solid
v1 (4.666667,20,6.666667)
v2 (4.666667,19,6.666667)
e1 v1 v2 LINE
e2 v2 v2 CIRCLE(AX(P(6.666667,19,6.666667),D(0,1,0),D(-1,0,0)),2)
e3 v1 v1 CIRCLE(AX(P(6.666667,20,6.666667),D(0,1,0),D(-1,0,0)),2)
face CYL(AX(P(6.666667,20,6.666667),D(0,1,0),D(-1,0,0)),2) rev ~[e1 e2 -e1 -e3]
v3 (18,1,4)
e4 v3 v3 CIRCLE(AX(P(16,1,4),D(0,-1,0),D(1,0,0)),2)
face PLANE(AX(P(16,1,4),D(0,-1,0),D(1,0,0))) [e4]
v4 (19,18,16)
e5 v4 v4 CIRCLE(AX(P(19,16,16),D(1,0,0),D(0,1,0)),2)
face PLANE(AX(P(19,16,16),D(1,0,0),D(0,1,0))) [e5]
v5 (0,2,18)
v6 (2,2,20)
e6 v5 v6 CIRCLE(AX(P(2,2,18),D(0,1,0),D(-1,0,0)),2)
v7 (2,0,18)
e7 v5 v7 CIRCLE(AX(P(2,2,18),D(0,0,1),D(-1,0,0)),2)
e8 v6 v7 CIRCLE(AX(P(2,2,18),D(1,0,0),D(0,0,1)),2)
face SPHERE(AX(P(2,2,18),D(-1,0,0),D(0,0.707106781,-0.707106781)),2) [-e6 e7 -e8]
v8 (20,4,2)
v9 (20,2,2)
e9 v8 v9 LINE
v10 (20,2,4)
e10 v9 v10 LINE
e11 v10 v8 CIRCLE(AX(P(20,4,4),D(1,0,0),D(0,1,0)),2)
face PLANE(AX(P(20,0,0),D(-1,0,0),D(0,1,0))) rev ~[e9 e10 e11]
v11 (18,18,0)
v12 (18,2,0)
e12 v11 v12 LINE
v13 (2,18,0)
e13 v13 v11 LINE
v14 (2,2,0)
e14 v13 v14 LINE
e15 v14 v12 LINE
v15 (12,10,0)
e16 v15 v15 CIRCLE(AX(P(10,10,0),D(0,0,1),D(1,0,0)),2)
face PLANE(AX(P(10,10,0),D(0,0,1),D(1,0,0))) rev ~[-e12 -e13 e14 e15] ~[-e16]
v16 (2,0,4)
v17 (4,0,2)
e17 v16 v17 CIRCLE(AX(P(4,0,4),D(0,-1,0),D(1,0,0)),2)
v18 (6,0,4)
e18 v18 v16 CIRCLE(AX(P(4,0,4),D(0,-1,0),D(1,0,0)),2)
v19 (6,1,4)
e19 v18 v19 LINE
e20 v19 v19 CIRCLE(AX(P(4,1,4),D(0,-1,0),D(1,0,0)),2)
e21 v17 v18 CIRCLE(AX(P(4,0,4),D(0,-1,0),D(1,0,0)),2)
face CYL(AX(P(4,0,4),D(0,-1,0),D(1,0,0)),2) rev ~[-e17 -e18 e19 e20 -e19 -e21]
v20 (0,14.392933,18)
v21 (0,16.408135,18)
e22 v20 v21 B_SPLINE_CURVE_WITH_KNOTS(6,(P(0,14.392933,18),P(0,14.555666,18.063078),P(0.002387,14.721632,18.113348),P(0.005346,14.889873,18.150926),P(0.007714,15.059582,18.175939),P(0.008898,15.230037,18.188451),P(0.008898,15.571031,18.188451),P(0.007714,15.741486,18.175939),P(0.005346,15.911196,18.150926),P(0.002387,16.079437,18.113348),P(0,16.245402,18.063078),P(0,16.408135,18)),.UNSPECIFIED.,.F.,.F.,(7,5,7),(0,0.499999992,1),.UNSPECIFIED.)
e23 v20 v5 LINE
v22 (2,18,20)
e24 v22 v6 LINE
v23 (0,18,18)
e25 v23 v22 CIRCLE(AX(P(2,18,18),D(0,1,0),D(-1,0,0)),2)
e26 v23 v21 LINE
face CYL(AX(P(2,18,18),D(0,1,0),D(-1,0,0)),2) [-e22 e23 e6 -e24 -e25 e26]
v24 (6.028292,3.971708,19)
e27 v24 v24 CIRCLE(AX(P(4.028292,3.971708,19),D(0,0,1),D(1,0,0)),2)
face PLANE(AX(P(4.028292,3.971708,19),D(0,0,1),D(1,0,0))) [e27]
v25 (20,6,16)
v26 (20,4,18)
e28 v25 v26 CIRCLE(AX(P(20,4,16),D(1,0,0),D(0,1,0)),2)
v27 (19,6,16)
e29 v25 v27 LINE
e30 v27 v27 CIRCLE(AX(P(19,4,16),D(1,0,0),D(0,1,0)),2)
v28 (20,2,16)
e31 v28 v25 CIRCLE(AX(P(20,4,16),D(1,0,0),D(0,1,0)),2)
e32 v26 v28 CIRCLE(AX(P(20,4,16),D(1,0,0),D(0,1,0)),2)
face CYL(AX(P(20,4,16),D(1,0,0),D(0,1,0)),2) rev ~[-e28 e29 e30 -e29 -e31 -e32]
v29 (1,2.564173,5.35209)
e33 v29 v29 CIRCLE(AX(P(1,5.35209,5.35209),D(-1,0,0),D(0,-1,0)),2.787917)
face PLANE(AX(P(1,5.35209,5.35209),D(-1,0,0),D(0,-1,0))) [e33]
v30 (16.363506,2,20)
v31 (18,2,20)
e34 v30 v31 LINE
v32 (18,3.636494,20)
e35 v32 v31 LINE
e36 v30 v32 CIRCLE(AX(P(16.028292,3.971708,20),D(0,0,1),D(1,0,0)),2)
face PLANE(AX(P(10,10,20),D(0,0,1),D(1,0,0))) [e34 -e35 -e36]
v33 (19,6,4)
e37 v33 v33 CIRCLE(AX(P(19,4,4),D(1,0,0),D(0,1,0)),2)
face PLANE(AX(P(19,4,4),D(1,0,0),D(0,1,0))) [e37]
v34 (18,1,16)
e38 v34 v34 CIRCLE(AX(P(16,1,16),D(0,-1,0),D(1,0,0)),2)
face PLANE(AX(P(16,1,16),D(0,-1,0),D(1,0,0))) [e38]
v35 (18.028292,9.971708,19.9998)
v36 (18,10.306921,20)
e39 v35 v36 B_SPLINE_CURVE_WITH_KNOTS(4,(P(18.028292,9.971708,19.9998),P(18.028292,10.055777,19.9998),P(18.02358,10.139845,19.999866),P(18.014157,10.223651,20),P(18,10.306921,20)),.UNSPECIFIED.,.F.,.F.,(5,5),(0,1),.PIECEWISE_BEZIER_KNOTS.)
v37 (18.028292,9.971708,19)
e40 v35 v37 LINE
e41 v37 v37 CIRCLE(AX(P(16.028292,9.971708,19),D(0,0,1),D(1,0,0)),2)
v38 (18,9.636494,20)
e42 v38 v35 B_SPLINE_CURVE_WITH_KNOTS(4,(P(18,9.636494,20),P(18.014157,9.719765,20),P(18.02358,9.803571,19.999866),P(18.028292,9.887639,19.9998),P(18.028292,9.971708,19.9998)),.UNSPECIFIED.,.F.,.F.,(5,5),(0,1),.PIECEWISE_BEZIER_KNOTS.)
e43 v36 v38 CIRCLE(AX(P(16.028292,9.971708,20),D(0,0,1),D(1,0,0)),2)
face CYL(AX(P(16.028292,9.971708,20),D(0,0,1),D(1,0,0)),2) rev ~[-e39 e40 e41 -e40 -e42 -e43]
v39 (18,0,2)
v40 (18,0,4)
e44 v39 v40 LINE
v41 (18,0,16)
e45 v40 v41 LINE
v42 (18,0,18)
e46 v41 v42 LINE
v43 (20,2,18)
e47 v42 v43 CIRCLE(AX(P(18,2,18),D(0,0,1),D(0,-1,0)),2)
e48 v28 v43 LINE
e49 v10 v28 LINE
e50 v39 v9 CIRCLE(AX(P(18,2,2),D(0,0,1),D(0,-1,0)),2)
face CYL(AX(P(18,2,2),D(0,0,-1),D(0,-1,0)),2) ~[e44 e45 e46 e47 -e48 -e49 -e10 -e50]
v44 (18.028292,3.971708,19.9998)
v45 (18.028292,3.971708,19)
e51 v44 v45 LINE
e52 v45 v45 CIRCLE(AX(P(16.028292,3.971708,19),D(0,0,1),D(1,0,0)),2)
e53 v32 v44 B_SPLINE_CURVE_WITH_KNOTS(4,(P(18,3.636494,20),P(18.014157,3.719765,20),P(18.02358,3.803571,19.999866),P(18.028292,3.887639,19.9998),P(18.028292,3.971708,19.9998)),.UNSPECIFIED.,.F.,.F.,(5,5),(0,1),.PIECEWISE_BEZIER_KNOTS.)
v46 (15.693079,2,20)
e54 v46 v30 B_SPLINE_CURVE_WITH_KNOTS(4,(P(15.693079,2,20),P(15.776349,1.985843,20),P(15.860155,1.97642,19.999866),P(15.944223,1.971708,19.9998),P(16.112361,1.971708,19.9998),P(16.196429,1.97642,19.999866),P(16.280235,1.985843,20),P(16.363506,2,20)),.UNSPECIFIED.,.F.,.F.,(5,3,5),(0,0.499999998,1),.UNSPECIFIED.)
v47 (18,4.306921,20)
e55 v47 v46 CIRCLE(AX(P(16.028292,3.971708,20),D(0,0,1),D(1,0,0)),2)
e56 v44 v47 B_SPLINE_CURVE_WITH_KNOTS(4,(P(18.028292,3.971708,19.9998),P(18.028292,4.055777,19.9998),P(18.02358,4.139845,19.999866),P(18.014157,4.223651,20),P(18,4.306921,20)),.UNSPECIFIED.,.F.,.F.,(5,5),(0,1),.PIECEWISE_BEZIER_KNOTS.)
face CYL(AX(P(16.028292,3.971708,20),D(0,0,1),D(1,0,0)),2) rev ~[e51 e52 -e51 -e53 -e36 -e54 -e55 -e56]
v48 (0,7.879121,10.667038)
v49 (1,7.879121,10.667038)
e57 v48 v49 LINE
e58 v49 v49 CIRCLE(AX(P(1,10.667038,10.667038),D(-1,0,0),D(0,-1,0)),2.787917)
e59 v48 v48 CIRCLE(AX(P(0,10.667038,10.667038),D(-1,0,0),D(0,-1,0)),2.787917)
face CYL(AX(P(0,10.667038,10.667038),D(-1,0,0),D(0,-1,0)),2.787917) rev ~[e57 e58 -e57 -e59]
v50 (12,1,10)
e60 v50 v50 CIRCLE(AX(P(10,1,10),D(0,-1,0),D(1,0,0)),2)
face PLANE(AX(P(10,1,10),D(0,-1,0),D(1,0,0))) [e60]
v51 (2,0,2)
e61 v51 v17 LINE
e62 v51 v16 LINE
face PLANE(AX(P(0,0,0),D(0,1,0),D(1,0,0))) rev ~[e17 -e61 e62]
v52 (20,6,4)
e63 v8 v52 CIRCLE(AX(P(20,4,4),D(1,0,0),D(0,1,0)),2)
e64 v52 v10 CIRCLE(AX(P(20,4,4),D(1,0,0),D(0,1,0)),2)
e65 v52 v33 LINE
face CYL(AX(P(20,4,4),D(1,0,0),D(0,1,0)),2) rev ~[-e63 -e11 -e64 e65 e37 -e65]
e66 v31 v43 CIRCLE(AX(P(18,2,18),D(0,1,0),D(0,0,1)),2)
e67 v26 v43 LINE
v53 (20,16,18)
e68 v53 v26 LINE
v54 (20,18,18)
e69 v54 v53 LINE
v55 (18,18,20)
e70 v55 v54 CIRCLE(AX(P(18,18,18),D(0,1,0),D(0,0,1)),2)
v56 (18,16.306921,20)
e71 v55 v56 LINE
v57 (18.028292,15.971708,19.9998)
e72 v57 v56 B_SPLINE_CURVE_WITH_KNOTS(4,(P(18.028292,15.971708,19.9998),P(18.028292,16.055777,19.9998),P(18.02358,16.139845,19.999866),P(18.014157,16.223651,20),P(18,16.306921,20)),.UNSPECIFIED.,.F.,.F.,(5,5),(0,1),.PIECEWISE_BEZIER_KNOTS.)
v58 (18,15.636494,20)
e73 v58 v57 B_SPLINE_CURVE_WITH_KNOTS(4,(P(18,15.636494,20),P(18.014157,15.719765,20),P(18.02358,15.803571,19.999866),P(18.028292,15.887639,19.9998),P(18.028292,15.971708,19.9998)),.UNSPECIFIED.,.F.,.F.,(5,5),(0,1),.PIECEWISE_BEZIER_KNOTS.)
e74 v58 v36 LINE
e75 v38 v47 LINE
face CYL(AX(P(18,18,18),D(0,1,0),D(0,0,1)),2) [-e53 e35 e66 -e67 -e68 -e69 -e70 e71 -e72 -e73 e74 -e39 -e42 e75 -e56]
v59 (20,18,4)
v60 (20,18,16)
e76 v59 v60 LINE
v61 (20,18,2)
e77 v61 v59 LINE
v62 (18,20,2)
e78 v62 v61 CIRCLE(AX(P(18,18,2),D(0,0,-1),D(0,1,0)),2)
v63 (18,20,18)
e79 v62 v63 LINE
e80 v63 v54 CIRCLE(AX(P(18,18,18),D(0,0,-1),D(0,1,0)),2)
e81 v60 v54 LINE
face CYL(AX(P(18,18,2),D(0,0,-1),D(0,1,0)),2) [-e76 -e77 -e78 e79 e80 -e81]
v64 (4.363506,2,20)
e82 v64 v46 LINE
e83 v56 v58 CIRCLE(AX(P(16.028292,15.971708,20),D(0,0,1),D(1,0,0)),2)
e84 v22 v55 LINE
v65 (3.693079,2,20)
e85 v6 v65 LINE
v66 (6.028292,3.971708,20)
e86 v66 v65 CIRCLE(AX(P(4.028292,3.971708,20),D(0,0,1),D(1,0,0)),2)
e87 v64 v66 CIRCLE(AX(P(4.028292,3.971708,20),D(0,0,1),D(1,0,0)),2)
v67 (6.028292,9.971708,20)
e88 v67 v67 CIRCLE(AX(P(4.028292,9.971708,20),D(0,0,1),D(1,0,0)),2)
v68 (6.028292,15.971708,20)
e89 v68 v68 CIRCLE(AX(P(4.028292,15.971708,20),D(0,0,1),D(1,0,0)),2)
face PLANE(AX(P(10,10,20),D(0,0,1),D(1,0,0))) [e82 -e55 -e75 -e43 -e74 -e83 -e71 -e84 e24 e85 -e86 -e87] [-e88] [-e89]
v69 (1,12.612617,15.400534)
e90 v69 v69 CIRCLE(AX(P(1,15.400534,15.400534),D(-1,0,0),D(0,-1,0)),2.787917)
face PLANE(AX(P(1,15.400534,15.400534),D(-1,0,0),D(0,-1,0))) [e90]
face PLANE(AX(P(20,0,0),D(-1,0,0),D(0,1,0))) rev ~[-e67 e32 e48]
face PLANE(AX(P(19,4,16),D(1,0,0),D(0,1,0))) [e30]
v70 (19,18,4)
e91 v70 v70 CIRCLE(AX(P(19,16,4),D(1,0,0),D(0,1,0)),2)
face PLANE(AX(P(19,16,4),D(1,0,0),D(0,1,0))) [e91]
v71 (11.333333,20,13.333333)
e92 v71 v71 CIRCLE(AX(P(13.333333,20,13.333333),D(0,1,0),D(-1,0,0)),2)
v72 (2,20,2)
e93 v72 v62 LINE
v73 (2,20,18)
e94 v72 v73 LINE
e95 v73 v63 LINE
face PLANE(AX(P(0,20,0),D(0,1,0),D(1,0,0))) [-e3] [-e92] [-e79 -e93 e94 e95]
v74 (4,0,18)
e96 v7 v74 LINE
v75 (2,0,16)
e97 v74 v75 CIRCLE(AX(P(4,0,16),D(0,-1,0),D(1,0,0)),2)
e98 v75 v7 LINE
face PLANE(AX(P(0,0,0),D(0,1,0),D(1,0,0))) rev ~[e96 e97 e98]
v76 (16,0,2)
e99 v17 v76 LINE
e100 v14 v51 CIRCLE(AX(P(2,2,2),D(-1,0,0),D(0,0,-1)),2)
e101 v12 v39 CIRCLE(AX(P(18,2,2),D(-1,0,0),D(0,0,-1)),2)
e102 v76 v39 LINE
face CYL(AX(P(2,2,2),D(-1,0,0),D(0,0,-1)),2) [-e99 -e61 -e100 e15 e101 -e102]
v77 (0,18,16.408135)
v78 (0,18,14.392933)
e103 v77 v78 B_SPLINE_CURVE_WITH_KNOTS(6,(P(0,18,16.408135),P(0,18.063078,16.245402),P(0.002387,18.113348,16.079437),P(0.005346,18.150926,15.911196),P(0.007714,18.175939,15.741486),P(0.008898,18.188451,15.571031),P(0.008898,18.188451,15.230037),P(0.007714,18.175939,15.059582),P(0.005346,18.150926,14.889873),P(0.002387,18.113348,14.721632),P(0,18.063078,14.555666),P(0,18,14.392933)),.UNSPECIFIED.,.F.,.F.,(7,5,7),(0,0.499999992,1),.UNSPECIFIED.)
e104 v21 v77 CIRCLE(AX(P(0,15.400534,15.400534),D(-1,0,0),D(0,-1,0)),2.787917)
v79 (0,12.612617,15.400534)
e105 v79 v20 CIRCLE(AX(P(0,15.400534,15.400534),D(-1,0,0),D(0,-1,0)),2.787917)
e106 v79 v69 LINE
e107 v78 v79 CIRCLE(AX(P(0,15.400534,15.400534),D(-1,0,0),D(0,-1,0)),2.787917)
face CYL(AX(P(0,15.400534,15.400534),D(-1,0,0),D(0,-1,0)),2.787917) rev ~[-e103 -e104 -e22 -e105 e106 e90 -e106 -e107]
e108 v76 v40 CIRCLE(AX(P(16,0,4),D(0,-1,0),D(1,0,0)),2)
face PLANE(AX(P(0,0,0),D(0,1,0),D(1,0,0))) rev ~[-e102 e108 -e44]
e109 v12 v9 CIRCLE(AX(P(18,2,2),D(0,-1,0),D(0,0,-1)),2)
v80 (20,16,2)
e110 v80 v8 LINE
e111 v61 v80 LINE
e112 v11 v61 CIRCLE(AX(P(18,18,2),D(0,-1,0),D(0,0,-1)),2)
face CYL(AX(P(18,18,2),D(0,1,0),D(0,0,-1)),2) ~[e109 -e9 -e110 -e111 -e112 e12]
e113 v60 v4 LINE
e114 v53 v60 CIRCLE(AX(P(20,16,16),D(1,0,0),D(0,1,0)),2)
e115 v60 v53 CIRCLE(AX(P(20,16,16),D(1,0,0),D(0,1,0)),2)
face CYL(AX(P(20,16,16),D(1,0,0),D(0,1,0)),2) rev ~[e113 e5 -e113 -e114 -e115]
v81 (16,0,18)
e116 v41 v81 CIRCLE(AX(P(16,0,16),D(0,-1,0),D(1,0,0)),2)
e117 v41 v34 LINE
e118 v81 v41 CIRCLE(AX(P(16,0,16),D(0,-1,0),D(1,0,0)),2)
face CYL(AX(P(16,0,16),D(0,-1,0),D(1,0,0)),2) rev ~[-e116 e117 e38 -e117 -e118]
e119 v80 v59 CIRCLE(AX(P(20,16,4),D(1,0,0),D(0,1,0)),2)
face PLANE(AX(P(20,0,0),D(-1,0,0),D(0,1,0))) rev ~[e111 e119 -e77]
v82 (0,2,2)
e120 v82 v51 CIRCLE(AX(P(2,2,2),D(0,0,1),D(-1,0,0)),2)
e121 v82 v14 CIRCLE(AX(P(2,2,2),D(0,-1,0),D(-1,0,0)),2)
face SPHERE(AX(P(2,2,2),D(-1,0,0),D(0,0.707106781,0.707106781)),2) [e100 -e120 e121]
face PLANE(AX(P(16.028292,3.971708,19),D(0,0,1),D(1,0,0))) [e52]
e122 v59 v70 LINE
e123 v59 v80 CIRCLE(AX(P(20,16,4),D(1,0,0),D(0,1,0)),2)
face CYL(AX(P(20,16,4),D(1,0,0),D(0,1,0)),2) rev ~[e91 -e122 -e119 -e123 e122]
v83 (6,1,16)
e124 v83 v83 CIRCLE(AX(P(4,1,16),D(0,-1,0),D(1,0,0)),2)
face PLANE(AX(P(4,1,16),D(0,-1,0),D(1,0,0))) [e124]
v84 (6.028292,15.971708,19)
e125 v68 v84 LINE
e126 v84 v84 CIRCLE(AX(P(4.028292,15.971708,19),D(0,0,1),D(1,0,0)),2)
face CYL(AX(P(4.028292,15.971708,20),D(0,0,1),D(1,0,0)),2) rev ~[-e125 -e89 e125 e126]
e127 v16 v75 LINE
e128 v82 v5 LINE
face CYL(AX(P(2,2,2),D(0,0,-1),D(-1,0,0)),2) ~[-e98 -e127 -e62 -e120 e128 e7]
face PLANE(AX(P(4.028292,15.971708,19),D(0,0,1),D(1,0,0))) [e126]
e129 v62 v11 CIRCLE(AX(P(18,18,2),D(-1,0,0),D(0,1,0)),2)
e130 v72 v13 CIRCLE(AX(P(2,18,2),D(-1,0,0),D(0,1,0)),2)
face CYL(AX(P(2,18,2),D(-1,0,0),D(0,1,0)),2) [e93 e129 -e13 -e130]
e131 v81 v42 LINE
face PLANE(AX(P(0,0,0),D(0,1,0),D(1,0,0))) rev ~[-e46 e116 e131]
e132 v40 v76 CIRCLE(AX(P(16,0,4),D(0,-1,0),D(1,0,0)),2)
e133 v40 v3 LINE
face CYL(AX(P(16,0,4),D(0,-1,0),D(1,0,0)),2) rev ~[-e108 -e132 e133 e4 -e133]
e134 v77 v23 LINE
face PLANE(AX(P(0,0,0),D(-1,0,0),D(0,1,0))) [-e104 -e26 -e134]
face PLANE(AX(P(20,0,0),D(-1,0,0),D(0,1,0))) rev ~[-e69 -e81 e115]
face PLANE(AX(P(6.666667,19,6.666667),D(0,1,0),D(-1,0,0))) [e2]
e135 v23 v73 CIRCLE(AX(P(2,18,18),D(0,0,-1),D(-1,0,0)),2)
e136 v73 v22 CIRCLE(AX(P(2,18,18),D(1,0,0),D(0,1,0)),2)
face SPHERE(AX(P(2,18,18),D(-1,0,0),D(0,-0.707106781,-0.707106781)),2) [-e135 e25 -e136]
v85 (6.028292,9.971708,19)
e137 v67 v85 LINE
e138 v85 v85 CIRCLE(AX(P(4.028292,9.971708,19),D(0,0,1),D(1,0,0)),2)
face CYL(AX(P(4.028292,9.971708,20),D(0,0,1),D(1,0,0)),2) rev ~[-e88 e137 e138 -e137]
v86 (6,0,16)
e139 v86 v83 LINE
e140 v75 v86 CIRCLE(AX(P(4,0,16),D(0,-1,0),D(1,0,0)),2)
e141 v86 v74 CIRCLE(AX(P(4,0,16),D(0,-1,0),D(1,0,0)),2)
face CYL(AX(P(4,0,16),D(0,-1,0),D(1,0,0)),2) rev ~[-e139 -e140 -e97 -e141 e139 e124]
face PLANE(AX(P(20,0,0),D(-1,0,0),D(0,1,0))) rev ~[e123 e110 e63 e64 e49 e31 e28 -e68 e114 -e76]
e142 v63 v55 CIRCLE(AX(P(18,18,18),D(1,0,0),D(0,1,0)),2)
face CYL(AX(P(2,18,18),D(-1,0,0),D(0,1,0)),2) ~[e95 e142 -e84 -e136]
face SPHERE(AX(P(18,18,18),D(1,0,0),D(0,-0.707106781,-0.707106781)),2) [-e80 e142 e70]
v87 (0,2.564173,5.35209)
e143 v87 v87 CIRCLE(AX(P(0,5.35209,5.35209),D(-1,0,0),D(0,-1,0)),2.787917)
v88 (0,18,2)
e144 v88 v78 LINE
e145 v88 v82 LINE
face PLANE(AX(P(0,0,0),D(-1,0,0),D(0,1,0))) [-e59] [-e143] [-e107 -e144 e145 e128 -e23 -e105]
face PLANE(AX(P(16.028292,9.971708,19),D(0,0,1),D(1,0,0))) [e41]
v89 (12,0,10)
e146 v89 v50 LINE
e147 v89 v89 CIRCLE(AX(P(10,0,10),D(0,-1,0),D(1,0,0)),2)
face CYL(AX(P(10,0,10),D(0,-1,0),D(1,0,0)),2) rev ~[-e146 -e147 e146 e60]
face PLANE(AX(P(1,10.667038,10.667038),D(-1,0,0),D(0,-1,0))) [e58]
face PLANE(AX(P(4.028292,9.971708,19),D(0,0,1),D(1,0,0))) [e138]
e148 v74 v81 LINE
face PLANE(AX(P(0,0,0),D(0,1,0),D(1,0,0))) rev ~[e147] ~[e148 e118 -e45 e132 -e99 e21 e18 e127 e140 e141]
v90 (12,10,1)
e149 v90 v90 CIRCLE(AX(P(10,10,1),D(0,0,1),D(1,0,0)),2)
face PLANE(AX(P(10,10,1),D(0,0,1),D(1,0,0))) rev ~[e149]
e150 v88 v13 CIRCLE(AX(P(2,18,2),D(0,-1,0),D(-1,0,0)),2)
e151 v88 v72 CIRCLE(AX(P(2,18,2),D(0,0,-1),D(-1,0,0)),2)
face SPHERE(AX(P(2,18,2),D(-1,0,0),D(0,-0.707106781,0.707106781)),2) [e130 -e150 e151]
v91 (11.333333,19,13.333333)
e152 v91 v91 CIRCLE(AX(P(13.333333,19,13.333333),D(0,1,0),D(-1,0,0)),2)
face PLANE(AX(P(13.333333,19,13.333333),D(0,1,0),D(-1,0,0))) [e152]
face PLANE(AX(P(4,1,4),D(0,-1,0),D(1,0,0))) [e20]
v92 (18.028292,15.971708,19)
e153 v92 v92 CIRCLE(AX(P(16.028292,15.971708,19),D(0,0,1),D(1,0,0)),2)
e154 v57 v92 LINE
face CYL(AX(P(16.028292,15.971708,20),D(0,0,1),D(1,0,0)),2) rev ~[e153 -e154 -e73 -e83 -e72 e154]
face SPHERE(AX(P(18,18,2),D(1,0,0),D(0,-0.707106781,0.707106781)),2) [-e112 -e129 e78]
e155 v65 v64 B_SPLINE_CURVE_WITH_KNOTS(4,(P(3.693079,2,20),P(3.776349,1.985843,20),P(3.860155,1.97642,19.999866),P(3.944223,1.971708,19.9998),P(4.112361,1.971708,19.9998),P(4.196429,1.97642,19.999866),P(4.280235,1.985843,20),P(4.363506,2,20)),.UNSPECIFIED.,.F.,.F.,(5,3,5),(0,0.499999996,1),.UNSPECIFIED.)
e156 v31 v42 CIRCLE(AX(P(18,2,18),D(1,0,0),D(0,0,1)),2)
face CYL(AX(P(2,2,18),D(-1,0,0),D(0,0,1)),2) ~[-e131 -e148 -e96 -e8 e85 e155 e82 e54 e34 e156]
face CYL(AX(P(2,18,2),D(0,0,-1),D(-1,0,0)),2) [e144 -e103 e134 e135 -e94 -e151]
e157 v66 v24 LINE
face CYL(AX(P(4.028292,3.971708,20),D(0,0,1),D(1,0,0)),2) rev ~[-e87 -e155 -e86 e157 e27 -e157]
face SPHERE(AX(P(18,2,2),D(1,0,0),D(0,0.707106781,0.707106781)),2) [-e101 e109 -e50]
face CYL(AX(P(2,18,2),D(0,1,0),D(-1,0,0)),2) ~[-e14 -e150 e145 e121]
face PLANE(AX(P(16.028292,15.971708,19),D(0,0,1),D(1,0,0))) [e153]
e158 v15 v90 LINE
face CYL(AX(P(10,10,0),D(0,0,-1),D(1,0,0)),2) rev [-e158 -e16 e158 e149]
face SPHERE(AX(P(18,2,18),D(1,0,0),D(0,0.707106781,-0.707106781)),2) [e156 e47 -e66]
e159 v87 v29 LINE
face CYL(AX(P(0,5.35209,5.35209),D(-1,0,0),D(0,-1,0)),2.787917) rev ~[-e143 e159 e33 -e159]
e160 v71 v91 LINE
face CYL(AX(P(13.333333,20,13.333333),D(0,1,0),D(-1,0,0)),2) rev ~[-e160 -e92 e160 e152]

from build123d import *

# Parameters (mm, degrees)
F0_W          = 20
F0_H          = 20
F1_DEPTH      = 20
F3_R          = 2
F8_DEPTH      = 1
F2_R          = 2
F11_DEPTH     = 1
F6_R          = 2.787917168
F12_DEPTH     = 1
F4_R          = 2
F13_DEPTH     = 1
F14_DEPTH     = 1
F5_R          = 2
F15_DEPTH     = 1
F7_R          = 2
F16_DEPTH     = 1
F17_T1_DEPTH  = 16
F17_T3_DEPTH  = 16
F17_T5_DEPTH  = 16
F17_S9_W      = 2
F17_S9_H      = 2
F17_T10_DEPTH = 2
F17_S15_W     = 2
F17_S15_H     = 2
F17_T16_DEPTH = 2
F17_S21_W     = 2
F17_S21_H     = 2
F17_T22_DEPTH = 2
F17_S27_W     = 2
F17_S27_H     = 2
F17_T28_DEPTH = 2
F17_S33_W     = 2
F17_S33_H     = 2
F17_T34_DEPTH = 2
F17_S39_W     = 2
F17_S39_H     = 2
F17_T40_DEPTH = 2
F17_S45_W     = 2
F17_S45_H     = 2
F17_T46_DEPTH = 2
F17_S51_W     = 2
F17_S51_H     = 2
F17_T52_DEPTH = 2


# Not quite as in the source:
# - a fillet or chamfer that OpenCascade refuses, or shapes differently, is made with other operations: its cross-section is extruded or revolved along the edge and cut away or added
# - a feature of the source that left no trace in its solid (it failed there, or was rolled back) is left out


with BuildPart() as f1:
    # F0 (on Top) → F1 (new body)
    with BuildSketch(Plane.XY):
        with Locations((10, 10)):
            Rectangle(F0_W, F0_H)
    extrude(amount=F1_DEPTH)

    # F3 (on face) → F8 (cut)
    with BuildSketch(Plane.XY.offset(20)):
        with Locations((4.0282921307, 15.9717078693)):
            Circle(F3_R)
        with Locations((4.0282921307, 9.9717078693)):
            Circle(F3_R)
        with Locations((4.0282921307, 3.9717078693)):
            Circle(F3_R)
        with Locations((16.0282921307, 15.9717078693)):
            Circle(F3_R)
        with Locations((16.0282921307, 9.9717078693)):
            Circle(F3_R)
        with Locations((16.0282921307, 3.9717078693)):
            Circle(F3_R)
    extrude(amount=-F8_DEPTH, mode=Mode.SUBTRACT)

    # F2 (on Top) → F11 (cut)
    with BuildSketch(Plane.XY):
        with Locations((10, 10)):
            Circle(F2_R)
    extrude(amount=F11_DEPTH, mode=Mode.SUBTRACT)

    # F6 (on face) → F12 (cut)
    with BuildSketch(Plane(origin=(0, 0, 0), x_dir=(0, -1, 0), z_dir=(-1, 0, 0))):
        with Locations((-15.4005342424, 15.4005342424)):
            Circle(F6_R)
        with Locations((-10.667038206, 10.667038206)):
            Circle(F6_R)
        with Locations((-5.3520903582, 5.3520903582)):
            Circle(F6_R)
    extrude(amount=-F12_DEPTH, mode=Mode.SUBTRACT)

    # F4 (on Front) → F13 (cut)
    with BuildSketch(Plane.XZ):
        with Locations((16, 4)):
            Circle(F4_R)
        with Locations((4, 16)):
            Circle(F4_R)
        with Locations((16, 16)):
            Circle(F4_R)
        with Locations((4, 4)):
            Circle(F4_R)
        with Locations((10, 10)):
            Circle(F4_R)
    extrude(amount=-F13_DEPTH, mode=Mode.SUBTRACT)

    # F6 (on face) → F14 (cut)
    with BuildSketch(Plane(origin=(0, 0, 0), x_dir=(0, -1, 0), z_dir=(-1, 0, 0))):
        with Locations((-15.4005342424, 15.4005342424)):
            Circle(F6_R)
        with Locations((-10.667038206, 10.667038206)):
            Circle(F6_R)
        with Locations((-5.3520903582, 5.3520903582)):
            Circle(F6_R)
    extrude(amount=-F14_DEPTH, mode=Mode.SUBTRACT)

    # F5 (on face) → F15 (cut)
    with BuildSketch(Plane(origin=(0, 20, 0), x_dir=(-1, 0, 0), z_dir=(0, 1, 0))):
        with Locations((-13.3333333333, 13.3333333333)):
            Circle(F5_R)
        with Locations((-6.6666666667, 6.6666666667)):
            Circle(F5_R)
    extrude(amount=-F15_DEPTH, mode=Mode.SUBTRACT)

    # F7 (on face) → F16 (cut)
    with BuildSketch(Plane.YZ.offset(20)):
        with Locations((16, 4)):
            Circle(F7_R)
        with Locations((16, 16)):
            Circle(F7_R)
        with Locations((4, 16)):
            Circle(F7_R)
        with Locations((4, 4)):
            Circle(F7_R)
    extrude(amount=-F16_DEPTH, mode=Mode.SUBTRACT)

    # F17: fillet of radius 2 on 12 edges, made by hand

    # F17_s2 → F17_t1 (cut)
    with BuildSketch(Plane.YZ.offset(2)):
        with BuildLine():
            ThreePointArc((20, 2), (19.4142135624, 0.5857864376), (18, 0))
            Line((18, 0), (20, 0))
            Line((20, 0), (20, 2))
        make_face()
        with BuildLine():
            ThreePointArc((2, 0), (0.5857864376, 0.5857864376), (0, 2))
            Line((0, 2), (0, 0))
            Line((0, 0), (2, 0))
        make_face()
        with BuildLine():
            ThreePointArc((2, 20), (0.5857864376, 19.4142135624), (0, 18))
            Line((0, 18), (0, 20))
            Line((0, 20), (2, 20))
        make_face()
        with BuildLine():
            ThreePointArc((20, 18), (19.4142135624, 19.4142135624), (18, 20))
            Line((18, 20), (20, 20))
            Line((20, 20), (20, 18))
        make_face()
    extrude(amount=F17_T1_DEPTH, mode=Mode.SUBTRACT)

    # F17_s4 → F17_t3 (cut)
    with BuildSketch(Plane.XZ.offset(-18)):
        with BuildLine():
            ThreePointArc((18, 0), (19.4142135624, 0.5857864376), (20, 2))
            Line((20, 2), (20, 0))
            Line((20, 0), (18, 0))
        make_face()
        with BuildLine():
            ThreePointArc((0, 2), (0.5857864376, 0.5857864376), (2, 0))
            Line((2, 0), (0, 0))
            Line((0, 0), (0, 2))
        make_face()
        with BuildLine():
            ThreePointArc((0, 18), (0.5857864376, 19.4142135624), (2, 20))
            Line((2, 20), (0, 20))
            Line((0, 20), (0, 18))
        make_face()
        with BuildLine():
            ThreePointArc((18, 20), (19.4142135624, 19.4142135624), (20, 18))
            Line((20, 18), (20, 20))
            Line((20, 20), (18, 20))
        make_face()
    extrude(amount=F17_T3_DEPTH, mode=Mode.SUBTRACT)

    # F17_s6 → F17_t5 (cut)
    with BuildSketch(Plane.XY.offset(2)):
        with BuildLine():
            ThreePointArc((0, 2), (0.5857864376, 0.5857864376), (2, 0))
            Line((2, 0), (0, 0))
            Line((0, 0), (0, 2))
        make_face()
        with BuildLine():
            ThreePointArc((0, 18), (0.5857864376, 19.4142135624), (2, 20))
            Line((2, 20), (0, 20))
            Line((0, 20), (0, 18))
        make_face()
        with BuildLine():
            ThreePointArc((18, 0), (19.4142135624, 0.5857864376), (20, 2))
            Line((20, 2), (20, 0))
            Line((20, 0), (18, 0))
        make_face()
        with BuildLine():
            ThreePointArc((18, 20), (19.4142135624, 19.4142135624), (20, 18))
            Line((20, 18), (20, 20))
            Line((20, 20), (18, 20))
        make_face()
    extrude(amount=F17_T5_DEPTH, mode=Mode.SUBTRACT)


with BuildPart() as f17_tool8:
    # F17_s9 → F17_t10 (new body)
    with BuildSketch(Plane.YZ.offset(18)):
        with Locations((19, 1)):
            Rectangle(F17_S9_W, F17_S9_H)
    extrude(amount=F17_T10_DEPTH)

    # F17_s11 → F17_t12 (revolve, cut)
    with BuildSketch(Plane(origin=(18, 18, 2), x_dir=(0, -0.7071067812, 0.7071067812), z_dir=(0, 0.7071067812, 0.7071067812))):
        with BuildLine():
            ThreePointArc((0, -2), (2, 0), (0, 2))
            Line((0, 2), (0, -2))
        make_face()
    revolve(axis=Axis((18, 18, 2), (1, 0, 0)), mode=Mode.SUBTRACT)


with BuildPart() as f1_1:
    add(f1.part)

    # F17_t7: cut F17_tool8
    add(f17_tool8.part, mode=Mode.SUBTRACT)


with BuildPart() as f17_tool14:
    # F17_s15 → F17_t16 (new body)
    with BuildSketch(Plane.YZ.offset(2)):
        with Locations((19, 1)):
            Rectangle(F17_S15_W, F17_S15_H)
    extrude(amount=-F17_T16_DEPTH)

    # F17_s17 → F17_t18 (revolve, cut)
    with BuildSketch(Plane(origin=(2, 18, 2), x_dir=(0, -0.7071067812, 0.7071067812), z_dir=(0, -0.7071067812, -0.7071067812))):
        with BuildLine():
            ThreePointArc((0, -2), (2, 0), (0, 2))
            Line((0, 2), (0, -2))
        make_face()
    revolve(axis=Axis((2, 18, 2), (-1, 0, 0)), mode=Mode.SUBTRACT)


with BuildPart() as f1_2:
    add(f1_1.part)

    # F17_t13: cut F17_tool14
    add(f17_tool14.part, mode=Mode.SUBTRACT)


with BuildPart() as f17_tool20:
    # F17_s21 → F17_t22 (new body)
    with BuildSketch(Plane.YZ.offset(18)):
        with Locations((1, 1)):
            Rectangle(F17_S21_W, F17_S21_H)
    extrude(amount=F17_T22_DEPTH)

    # F17_s23 → F17_t24 (revolve, cut)
    with BuildSketch(Plane(origin=(18, 2, 2), x_dir=(0, 0.7071067812, 0.7071067812), z_dir=(0, 0.7071067812, -0.7071067812))):
        with BuildLine():
            ThreePointArc((0, -2), (2, 0), (0, 2))
            Line((0, 2), (0, -2))
        make_face()
    revolve(axis=Axis((18, 2, 2), (1, 0, 0)), mode=Mode.SUBTRACT)


with BuildPart() as f1_3:
    add(f1_2.part)

    # F17_t19: cut F17_tool20
    add(f17_tool20.part, mode=Mode.SUBTRACT)


with BuildPart() as f17_tool26:
    # F17_s27 → F17_t28 (new body)
    with BuildSketch(Plane.YZ.offset(2)):
        with Locations((1, 1)):
            Rectangle(F17_S27_W, F17_S27_H)
    extrude(amount=-F17_T28_DEPTH)

    # F17_s29 → F17_t30 (revolve, cut)
    with BuildSketch(Plane(origin=(2, 2, 2), x_dir=(0, 0.7071067812, 0.7071067812), z_dir=(0, -0.7071067812, 0.7071067812))):
        with BuildLine():
            ThreePointArc((0, -2), (2, 0), (0, 2))
            Line((0, 2), (0, -2))
        make_face()
    revolve(axis=Axis((2, 2, 2), (-1, 0, 0)), mode=Mode.SUBTRACT)


with BuildPart() as f1_4:
    add(f1_3.part)

    # F17_t25: cut F17_tool26
    add(f17_tool26.part, mode=Mode.SUBTRACT)


with BuildPart() as f17_tool32:
    # F17_s33 → F17_t34 (new body)
    with BuildSketch(Plane.YZ.offset(2)):
        with Locations((1, 19)):
            Rectangle(F17_S33_W, F17_S33_H)
    extrude(amount=-F17_T34_DEPTH)

    # F17_s35 → F17_t36 (revolve, cut)
    with BuildSketch(Plane(origin=(2, 2, 18), x_dir=(0, 0.7071067812, -0.7071067812), z_dir=(0, 0.7071067812, 0.7071067812))):
        with BuildLine():
            ThreePointArc((0, -2), (2, 0), (0, 2))
            Line((0, 2), (0, -2))
        make_face()
    revolve(axis=Axis((2, 2, 18), (-1, 0, 0)), mode=Mode.SUBTRACT)


with BuildPart() as f1_5:
    add(f1_4.part)

    # F17_t31: cut F17_tool32
    add(f17_tool32.part, mode=Mode.SUBTRACT)


with BuildPart() as f17_tool38:
    # F17_s39 → F17_t40 (new body)
    with BuildSketch(Plane.YZ.offset(2)):
        with Locations((19, 19)):
            Rectangle(F17_S39_W, F17_S39_H)
    extrude(amount=-F17_T40_DEPTH)

    # F17_s41 → F17_t42 (revolve, cut)
    with BuildSketch(Plane(origin=(2, 18, 18), x_dir=(0, -0.7071067812, -0.7071067812), z_dir=(0, 0.7071067812, -0.7071067812))):
        with BuildLine():
            ThreePointArc((0, -2), (2, 0), (0, 2))
            Line((0, 2), (0, -2))
        make_face()
    revolve(axis=Axis((2, 18, 18), (-1, 0, 0)), mode=Mode.SUBTRACT)


with BuildPart() as f1_6:
    add(f1_5.part)

    # F17_t37: cut F17_tool38
    add(f17_tool38.part, mode=Mode.SUBTRACT)


with BuildPart() as f17_tool44:
    # F17_s45 → F17_t46 (new body)
    with BuildSketch(Plane.YZ.offset(18)):
        with Locations((1, 19)):
            Rectangle(F17_S45_W, F17_S45_H)
    extrude(amount=F17_T46_DEPTH)

    # F17_s47 → F17_t48 (revolve, cut)
    with BuildSketch(Plane(origin=(18, 2, 18), x_dir=(0, 0.7071067812, -0.7071067812), z_dir=(0, -0.7071067812, -0.7071067812))):
        with BuildLine():
            ThreePointArc((0, -2), (2, 0), (0, 2))
            Line((0, 2), (0, -2))
        make_face()
    revolve(axis=Axis((18, 2, 18), (1, 0, 0)), mode=Mode.SUBTRACT)


with BuildPart() as f1_7:
    add(f1_6.part)

    # F17_t43: cut F17_tool44
    add(f17_tool44.part, mode=Mode.SUBTRACT)


with BuildPart() as f17_tool50:
    # F17_s51 → F17_t52 (new body)
    with BuildSketch(Plane.YZ.offset(18)):
        with Locations((19, 19)):
            Rectangle(F17_S51_W, F17_S51_H)
    extrude(amount=F17_T52_DEPTH)

    # F17_s53 → F17_t54 (revolve, cut)
    with BuildSketch(Plane(origin=(18, 18, 18), x_dir=(0, -0.7071067812, -0.7071067812), z_dir=(0, -0.7071067812, 0.7071067812))):
        with BuildLine():
            ThreePointArc((0, -2), (2, 0), (0, 2))
            Line((0, 2), (0, -2))
        make_face()
    revolve(axis=Axis((18, 18, 18), (1, 0, 0)), mode=Mode.SUBTRACT)


with BuildPart() as f1_8:
    add(f1_7.part)

    # F17_t49: cut F17_tool50
    add(f17_tool50.part, mode=Mode.SUBTRACT)


solid = f1_8.part
